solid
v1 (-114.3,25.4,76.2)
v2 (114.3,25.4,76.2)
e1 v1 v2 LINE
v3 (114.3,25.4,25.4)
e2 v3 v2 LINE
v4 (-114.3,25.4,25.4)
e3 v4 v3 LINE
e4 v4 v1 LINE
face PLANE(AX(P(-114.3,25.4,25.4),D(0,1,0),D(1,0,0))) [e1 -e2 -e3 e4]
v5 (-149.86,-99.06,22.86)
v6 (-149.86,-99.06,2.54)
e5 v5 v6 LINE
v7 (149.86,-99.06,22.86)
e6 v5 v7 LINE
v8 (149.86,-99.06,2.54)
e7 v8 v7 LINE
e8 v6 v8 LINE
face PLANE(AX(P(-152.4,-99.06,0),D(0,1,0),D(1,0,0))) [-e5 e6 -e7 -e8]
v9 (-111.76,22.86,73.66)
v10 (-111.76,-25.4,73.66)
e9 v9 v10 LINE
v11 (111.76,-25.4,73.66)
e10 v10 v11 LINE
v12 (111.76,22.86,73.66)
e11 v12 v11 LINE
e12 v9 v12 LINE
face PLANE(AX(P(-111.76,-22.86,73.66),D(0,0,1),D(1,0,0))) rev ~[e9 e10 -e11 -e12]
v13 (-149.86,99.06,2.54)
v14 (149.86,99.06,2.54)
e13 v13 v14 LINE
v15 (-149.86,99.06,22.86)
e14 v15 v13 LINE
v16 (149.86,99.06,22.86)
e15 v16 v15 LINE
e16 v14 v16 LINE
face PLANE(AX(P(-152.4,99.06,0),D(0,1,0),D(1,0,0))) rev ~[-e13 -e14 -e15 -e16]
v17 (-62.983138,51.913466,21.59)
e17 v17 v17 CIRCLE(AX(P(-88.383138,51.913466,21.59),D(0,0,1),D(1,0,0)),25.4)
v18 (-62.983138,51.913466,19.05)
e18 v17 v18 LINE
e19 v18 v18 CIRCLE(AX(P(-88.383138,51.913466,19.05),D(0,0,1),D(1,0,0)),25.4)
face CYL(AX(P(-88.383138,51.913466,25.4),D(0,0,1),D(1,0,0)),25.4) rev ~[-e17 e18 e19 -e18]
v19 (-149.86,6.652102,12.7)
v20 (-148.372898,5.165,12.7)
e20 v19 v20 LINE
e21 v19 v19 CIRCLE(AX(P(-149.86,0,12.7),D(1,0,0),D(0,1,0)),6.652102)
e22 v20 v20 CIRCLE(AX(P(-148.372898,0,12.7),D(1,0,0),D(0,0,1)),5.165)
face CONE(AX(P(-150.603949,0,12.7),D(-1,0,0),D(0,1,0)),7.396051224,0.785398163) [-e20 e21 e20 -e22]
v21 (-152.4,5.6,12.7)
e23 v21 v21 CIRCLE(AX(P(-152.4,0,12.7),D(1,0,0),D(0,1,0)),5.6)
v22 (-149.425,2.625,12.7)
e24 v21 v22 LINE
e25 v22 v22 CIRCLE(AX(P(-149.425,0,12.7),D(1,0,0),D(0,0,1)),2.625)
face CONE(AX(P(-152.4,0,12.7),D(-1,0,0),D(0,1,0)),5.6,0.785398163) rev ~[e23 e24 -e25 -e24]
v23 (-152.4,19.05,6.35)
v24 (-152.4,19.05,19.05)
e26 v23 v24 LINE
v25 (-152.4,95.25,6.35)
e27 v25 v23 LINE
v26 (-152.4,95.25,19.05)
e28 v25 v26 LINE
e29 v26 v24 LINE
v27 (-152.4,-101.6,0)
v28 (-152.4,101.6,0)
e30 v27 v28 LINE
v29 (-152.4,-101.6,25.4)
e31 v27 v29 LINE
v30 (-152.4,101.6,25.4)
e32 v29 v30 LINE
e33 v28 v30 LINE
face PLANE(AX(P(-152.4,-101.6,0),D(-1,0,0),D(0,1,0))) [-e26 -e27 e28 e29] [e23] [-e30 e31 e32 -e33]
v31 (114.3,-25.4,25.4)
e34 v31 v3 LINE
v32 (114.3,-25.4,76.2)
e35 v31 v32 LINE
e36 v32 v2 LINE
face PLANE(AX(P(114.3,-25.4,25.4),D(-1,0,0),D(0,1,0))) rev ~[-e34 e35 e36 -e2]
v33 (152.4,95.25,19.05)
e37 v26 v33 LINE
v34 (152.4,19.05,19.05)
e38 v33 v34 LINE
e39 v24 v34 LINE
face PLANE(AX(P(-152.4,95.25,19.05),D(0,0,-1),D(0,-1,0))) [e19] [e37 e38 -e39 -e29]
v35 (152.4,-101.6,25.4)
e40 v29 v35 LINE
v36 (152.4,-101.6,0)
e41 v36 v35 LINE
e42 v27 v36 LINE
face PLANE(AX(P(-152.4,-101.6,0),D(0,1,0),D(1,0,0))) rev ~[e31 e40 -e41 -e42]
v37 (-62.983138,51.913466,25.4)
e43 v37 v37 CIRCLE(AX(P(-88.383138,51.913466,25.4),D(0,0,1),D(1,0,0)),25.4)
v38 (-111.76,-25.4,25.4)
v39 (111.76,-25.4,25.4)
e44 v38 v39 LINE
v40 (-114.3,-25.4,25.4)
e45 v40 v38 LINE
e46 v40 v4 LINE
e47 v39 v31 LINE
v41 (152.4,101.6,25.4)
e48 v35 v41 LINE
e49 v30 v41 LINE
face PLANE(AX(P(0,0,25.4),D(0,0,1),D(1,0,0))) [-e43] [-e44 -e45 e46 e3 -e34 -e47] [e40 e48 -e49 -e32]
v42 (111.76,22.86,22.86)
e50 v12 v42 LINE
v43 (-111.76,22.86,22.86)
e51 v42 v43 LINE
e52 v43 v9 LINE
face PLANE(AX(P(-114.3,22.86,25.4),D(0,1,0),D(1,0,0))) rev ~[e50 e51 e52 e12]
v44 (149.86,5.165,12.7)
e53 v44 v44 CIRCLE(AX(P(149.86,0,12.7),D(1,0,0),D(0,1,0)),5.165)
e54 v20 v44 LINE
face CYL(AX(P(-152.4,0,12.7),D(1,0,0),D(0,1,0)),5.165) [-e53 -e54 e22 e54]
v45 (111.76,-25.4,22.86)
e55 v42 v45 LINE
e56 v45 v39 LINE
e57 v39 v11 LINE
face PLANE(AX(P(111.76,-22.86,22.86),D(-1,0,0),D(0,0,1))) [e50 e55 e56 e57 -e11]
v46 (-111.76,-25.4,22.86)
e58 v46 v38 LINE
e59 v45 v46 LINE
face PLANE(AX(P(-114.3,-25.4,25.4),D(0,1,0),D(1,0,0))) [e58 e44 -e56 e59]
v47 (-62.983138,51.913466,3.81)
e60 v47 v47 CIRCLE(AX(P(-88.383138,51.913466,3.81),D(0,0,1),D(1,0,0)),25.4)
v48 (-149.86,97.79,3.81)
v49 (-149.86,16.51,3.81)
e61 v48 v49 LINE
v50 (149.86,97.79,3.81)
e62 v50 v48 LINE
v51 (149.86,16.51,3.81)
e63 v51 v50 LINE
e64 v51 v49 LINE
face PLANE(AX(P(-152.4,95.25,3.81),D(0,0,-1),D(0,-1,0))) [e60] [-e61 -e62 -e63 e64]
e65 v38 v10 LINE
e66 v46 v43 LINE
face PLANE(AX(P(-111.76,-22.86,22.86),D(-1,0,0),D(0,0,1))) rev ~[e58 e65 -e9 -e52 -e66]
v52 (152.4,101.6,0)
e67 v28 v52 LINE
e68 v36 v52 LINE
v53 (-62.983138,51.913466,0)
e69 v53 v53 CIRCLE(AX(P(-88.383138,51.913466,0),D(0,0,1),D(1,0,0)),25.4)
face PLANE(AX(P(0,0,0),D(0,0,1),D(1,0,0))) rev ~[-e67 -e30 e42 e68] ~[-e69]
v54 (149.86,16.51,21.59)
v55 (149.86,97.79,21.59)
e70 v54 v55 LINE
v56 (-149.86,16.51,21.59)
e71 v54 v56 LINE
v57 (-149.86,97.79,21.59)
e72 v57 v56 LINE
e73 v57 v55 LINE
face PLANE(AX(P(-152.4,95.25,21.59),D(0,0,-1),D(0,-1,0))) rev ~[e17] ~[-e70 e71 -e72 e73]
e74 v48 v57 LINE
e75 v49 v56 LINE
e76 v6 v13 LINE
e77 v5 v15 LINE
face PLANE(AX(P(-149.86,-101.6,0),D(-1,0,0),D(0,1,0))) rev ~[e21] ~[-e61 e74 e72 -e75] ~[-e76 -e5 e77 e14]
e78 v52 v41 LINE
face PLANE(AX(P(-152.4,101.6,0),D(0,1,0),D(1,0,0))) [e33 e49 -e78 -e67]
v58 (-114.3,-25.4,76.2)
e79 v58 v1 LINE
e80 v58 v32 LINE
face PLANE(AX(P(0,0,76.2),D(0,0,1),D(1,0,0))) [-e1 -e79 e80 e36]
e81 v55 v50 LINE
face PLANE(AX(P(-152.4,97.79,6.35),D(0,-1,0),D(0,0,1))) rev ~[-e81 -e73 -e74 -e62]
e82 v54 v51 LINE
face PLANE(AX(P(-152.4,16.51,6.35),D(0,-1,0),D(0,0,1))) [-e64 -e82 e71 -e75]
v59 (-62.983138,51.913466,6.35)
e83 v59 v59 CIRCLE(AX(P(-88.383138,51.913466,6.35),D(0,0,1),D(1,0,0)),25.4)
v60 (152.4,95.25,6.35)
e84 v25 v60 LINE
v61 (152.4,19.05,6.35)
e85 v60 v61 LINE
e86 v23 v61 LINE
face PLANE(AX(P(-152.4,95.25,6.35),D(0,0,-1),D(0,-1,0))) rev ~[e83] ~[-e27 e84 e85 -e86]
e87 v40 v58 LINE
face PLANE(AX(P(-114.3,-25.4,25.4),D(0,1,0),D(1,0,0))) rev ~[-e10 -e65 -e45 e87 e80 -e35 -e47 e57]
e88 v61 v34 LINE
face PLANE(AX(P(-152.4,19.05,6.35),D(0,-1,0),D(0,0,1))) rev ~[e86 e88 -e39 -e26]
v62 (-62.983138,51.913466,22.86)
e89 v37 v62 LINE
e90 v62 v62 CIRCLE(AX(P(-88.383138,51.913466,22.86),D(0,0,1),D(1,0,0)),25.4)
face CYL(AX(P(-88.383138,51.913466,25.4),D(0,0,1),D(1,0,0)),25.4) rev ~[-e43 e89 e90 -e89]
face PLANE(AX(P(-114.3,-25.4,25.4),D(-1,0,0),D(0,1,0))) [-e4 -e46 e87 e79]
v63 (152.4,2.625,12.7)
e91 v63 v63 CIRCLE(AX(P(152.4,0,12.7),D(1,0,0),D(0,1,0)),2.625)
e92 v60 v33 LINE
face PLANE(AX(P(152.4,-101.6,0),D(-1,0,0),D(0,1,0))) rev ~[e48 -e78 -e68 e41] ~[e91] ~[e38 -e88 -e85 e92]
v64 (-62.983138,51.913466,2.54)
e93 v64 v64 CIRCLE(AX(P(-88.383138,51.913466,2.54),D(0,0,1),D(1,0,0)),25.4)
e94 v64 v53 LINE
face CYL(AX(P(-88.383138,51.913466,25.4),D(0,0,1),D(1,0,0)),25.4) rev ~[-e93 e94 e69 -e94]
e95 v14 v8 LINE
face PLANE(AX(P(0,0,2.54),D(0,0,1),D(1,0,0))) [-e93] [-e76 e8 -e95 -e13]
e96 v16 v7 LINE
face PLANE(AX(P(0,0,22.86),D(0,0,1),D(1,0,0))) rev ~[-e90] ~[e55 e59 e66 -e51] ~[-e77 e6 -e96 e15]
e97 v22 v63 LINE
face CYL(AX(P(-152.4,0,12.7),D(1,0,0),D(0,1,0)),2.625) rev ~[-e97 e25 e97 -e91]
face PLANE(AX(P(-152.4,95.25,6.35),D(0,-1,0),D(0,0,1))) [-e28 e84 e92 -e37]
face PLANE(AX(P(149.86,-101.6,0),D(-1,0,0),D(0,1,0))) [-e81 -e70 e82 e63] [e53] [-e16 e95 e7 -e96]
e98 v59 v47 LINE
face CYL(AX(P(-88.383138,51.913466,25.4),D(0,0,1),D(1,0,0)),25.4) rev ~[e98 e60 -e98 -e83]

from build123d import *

# Parameters (mm, degrees)
F0_W           = 304.8
F0_H           = 203.2
F1_DEPTH       = 25.4
F2_W           = 76.2
F2_H           = 12.7
F3_DEPTH       = 378.206
F6_D           = 5.25
F6_CSINK_D     = 11.2
F6_CSINK_ANGLE = 90
F7_W           = 228.6
F7_H           = 50.8
F8_DEPTH       = 50.8
F9_T           = -2.54
F4_R           = 25.4
F13_DEPTH      = 25.4


# Not quite as in the source:
# - a shell that OpenCascade refuses in one call is made with other operations: the cavity is built on its own and cut out
# - the program builds the solid bodies; features that only make, move or delete a surface that nothing else refers to are left out


with BuildPart() as f1:
    # F0 (on Top) → F1 (new body)
    with BuildSketch(Plane.XY):
        Rectangle(F0_W, F0_H)
    extrude(amount=F1_DEPTH)

    # F2 (on face) → F3 (cut)
    with BuildSketch(Plane(origin=(-152.4, 0, 0), x_dir=(0, -1, 0), z_dir=(-1, 0, 0))):
        with Locations((-57.15, 12.7)):
            Rectangle(F2_W, F2_H)
    extrude(amount=-F3_DEPTH, mode=Mode.SUBTRACT)

    # F6 (through all)
    with Locations(Plane(origin=(-152.4, 0, 0), x_dir=(0, -1, 0), z_dir=(-1, 0, 0))):
        with Locations((0, 12.7)):
            CounterSinkHole(F6_D / 2, F6_CSINK_D / 2, counter_sink_angle=F6_CSINK_ANGLE)

    # F7 (on face) → F8 (join)
    with BuildSketch(Plane.XY.offset(25.4)):
        Rectangle(F7_W, F7_H)
    extrude(amount=F8_DEPTH)

    # F9: a shell. OpenCascade refuses it in one call, so the cavity is built on its own and cut out:
    # the body offset inwards by the wall thickness, plus a prism from it out through each open face.
    f9_core = offset(f1.part, amount=F9_T, kind=Kind.INTERSECTION, mode=Mode.PRIVATE)
    f9_exits = [f9_core.faces().sort_by_distance(p)[0] for p in [
        (0, -22.86, 48.26),
    ]]
    add(f9_core, mode=Mode.SUBTRACT)
    extrude(f9_exits, amount=-F9_T, mode=Mode.SUBTRACT)

    # F4 (on face) → F13 (cut)
    with BuildSketch(Plane.XY.offset(25.4)):
        with Locations((-88.3831381798, 51.9134663045)):
            Circle(F4_R)
    extrude(amount=-F13_DEPTH, mode=Mode.SUBTRACT)


solid = f1.part
